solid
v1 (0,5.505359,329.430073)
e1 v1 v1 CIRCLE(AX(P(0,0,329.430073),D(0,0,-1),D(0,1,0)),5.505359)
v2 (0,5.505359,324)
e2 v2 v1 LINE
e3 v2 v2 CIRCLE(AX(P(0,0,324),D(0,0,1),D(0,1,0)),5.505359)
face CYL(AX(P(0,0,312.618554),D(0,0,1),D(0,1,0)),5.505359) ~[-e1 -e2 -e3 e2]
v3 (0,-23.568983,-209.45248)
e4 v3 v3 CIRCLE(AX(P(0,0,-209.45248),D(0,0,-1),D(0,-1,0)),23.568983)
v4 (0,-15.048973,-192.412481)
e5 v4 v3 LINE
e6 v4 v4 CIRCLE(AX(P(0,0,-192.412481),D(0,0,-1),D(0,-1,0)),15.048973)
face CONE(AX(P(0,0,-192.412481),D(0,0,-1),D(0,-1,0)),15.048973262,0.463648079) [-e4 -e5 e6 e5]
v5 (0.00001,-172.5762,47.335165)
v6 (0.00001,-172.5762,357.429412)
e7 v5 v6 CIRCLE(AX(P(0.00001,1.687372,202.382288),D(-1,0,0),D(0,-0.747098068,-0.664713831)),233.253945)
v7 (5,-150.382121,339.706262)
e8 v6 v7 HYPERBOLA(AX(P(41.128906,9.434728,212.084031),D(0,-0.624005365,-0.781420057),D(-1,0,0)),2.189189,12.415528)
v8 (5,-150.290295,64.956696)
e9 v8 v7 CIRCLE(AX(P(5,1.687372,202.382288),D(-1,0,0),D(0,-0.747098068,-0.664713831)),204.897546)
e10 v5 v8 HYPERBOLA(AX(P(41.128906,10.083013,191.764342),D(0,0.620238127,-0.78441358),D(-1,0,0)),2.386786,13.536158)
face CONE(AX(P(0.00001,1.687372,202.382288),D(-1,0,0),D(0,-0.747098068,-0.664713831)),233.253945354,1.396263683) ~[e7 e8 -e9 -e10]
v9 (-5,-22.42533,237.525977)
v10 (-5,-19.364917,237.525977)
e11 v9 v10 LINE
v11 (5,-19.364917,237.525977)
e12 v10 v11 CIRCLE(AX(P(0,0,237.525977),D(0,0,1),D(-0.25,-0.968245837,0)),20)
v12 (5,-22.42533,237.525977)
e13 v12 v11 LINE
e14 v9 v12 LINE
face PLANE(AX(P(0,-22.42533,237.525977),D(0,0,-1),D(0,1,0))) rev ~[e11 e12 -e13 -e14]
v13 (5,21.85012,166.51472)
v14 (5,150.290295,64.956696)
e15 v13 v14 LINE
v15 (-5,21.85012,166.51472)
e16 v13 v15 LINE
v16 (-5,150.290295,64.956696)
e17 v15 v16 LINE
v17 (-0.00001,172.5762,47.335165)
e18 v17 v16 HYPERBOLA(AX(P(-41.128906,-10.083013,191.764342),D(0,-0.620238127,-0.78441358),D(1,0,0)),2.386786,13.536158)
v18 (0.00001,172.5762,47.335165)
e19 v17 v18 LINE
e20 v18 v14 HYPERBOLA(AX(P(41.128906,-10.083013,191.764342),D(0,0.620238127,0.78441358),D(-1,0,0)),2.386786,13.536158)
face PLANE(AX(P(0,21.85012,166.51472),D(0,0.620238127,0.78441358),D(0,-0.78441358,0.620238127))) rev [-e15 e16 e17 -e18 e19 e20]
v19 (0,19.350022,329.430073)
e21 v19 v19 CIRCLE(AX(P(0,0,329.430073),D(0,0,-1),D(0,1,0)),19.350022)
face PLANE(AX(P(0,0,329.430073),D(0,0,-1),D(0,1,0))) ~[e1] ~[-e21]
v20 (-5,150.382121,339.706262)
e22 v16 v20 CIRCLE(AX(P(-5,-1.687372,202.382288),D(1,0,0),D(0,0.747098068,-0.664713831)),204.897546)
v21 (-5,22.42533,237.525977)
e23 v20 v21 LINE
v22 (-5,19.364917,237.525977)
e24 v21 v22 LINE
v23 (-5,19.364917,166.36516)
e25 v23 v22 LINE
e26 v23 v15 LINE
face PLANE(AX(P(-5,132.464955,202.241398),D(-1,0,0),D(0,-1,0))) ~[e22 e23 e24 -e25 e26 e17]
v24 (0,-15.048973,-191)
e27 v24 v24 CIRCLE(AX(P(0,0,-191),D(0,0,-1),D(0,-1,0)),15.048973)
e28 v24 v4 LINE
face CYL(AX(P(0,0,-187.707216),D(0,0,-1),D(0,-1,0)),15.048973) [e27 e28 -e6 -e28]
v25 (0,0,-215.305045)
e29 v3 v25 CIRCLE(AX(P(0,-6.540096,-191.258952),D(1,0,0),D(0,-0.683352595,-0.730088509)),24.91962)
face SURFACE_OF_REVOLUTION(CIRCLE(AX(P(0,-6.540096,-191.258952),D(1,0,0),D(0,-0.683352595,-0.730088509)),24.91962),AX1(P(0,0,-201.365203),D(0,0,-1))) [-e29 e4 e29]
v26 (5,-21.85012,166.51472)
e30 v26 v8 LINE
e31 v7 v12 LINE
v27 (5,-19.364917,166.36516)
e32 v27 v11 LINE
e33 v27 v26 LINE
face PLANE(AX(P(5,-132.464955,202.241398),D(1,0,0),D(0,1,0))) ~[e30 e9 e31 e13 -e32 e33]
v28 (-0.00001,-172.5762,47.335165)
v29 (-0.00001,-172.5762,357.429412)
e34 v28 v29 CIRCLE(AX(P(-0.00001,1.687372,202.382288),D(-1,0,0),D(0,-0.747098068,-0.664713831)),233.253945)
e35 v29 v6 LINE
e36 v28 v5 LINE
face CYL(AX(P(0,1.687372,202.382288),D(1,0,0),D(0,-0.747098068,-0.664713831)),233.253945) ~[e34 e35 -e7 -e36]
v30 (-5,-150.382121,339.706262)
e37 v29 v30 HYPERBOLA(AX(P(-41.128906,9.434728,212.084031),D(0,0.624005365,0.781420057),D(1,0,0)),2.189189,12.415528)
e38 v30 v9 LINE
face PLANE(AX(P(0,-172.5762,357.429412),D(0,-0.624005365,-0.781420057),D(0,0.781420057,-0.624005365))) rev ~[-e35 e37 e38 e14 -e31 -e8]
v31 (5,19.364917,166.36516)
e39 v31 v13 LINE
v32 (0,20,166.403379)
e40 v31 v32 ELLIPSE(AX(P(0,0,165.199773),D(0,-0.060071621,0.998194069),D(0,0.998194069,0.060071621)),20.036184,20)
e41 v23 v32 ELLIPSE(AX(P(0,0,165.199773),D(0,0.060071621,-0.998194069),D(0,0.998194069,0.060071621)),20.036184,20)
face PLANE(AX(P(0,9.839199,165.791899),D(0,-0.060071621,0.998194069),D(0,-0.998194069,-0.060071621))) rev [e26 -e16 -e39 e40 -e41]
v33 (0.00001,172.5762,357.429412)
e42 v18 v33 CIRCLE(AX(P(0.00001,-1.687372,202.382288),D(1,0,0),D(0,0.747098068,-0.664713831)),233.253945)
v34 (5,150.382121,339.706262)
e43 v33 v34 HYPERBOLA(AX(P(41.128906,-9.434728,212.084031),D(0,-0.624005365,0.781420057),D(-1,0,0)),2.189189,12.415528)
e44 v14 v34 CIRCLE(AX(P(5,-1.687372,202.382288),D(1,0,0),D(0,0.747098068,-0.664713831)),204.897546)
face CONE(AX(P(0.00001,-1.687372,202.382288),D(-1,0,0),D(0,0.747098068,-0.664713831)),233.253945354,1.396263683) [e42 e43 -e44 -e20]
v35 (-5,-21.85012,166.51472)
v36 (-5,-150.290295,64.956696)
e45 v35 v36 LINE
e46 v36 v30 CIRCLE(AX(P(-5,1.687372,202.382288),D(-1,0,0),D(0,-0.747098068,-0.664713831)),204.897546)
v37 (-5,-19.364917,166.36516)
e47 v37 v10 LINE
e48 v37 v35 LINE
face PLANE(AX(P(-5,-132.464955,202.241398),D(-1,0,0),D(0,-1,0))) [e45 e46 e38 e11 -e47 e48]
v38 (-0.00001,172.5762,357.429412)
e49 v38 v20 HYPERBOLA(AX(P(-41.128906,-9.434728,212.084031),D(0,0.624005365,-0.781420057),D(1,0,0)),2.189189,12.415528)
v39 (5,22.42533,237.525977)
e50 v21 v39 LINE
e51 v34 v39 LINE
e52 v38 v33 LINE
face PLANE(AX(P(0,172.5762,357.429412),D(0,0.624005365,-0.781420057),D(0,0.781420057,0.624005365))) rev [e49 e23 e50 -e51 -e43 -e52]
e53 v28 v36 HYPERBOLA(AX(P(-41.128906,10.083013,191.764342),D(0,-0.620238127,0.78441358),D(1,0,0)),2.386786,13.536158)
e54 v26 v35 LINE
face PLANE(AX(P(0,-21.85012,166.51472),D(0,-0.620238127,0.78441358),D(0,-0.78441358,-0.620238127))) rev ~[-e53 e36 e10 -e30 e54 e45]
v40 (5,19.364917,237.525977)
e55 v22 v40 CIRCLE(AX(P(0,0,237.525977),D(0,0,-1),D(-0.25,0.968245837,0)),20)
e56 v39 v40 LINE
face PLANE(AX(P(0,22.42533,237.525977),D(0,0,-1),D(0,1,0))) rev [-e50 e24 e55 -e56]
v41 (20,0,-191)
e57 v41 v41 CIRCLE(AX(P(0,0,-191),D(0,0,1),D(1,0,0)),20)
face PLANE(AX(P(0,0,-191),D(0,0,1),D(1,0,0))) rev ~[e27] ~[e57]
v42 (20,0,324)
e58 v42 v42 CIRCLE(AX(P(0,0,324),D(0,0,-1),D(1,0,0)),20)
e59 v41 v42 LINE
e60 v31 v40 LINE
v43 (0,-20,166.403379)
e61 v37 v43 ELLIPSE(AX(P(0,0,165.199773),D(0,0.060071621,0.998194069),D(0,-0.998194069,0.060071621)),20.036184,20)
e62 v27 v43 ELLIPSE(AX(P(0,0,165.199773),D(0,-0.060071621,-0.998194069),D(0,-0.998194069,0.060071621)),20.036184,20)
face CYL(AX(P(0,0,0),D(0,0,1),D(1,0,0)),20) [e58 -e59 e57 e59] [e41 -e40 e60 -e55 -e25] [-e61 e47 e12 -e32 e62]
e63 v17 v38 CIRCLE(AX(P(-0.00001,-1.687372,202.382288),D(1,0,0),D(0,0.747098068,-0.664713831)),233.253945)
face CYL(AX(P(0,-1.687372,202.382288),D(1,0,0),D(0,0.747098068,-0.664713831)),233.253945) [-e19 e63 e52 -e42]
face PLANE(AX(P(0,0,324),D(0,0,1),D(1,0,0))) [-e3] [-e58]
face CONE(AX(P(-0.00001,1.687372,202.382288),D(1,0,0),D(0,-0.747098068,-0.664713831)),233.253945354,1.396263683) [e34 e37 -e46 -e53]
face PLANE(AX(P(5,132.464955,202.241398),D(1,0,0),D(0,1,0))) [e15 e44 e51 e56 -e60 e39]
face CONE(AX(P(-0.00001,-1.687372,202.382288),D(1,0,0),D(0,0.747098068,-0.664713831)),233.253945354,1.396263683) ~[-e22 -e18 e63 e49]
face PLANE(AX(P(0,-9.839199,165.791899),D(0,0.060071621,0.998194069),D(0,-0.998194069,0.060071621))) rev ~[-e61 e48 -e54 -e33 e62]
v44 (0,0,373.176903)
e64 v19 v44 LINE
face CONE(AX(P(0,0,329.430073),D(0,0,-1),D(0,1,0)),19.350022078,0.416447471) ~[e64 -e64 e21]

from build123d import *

# Parameters (mm, degrees)
F0_R          = 20
F1_DEPTH      = 324
F1_DEPTH_BACK = 191
F3_DEPTH      = 5
F4_SIZE2      = 28.356399
F4_SIZE       = 4.99999


# Not quite as in the source:
# - a fillet or chamfer is up to 0.001 mm smaller than in the source, because OpenCascade refuses the exact size


with BuildPart() as f1:
    # F0 (on Top) → F1 (new body, two sides)
    with BuildSketch(Plane.XY) as f1_sk:
        Circle(F0_R)
    extrude(amount=F1_DEPTH)
    extrude(f1_sk.sketch, amount=-F1_DEPTH_BACK)

    # F2 (on Right) → F3 (join)
    with BuildSketch(Plane.YZ):
        with BuildLine():
            Line((9.8391985521, 165.7918989658), (21.8501202762, 166.5147198653))
            Line((21.8501202762, 166.5147198653), (172.5762003339, 47.3351646042))
            ThreePointArc((172.5762003339, 47.3351646042), (231.5665738369, 202.382288244), (172.5762003339, 357.4294118838))
            Line((172.5762003339, 357.4294118838), (22.4253297422, 237.5259771443))
            Line((22.4253297422, 237.5259771443), (9.8391985521, 237.5259771443))
            Line((9.8391985521, 237.5259771443), (9.8391985521, 165.7918989658))
        make_face()
    extrude(amount=F3_DEPTH)

    # F4 (size 5 and 28.3564090981 in the source; OpenCascade refuses exactly that, so slightly less here)
    f4_edges = [f1.edges().sort_by_distance(p)[0] for p in [
        (5, 231.566574, 202.382288),
    ]]
    f4_side = f1.faces().sort_by_distance((2.5, 231.566574, 202.382288))[0]
    chamfer(f4_edges, length=F4_SIZE, length2=F4_SIZE2, reference=f4_side)

    # F5: F1 across plane


with BuildPart() as f1_1:
    add(f1.part)
    add(f1.part.mirror(Plane.YZ))

    # F6: F1 across plane


with BuildPart() as f1_2:
    add(f1_1.part)
    add(f1_1.part.mirror(Plane.XZ))

    # F7 (on Right) → F8 (revolve)
    with BuildSketch(Plane.YZ):
        Polygon((5.505359266, 312.6185536385), (5.505359266, 329.4300734997), (19.3500220776, 329.4300734997), (0, 373.1769025326), (0, 329.4300734997), (0, 312.6185536385), align=None)
    revolve(axis=Axis((0, 0, 351.3034880161), (0, 0, -1)))

    # F9 (on Right) → F10 (revolve)
    with BuildSketch(Plane.YZ):
        with BuildLine():
            Line((-15.0489732623, -187.7072155476), (-15.0489732623, -192.4124807119))
            Line((-15.0489732623, -192.4124807119), (-23.5689829473, -209.4524800777))
            ThreePointArc((-23.5689829473, -209.4524800777), (-12.5456612149, -215.444084642), (0, -215.3050452471))
            Line((0, -215.3050452471), (0, -209.4524800777))
            Line((0, -209.4524800777), (0, -193.2779252529))
            Line((0, -193.2779252529), (0, -187.7072155476))
            Line((0, -187.7072155476), (-15.0489732623, -187.7072155476))
        make_face()
    revolve(axis=Axis((0, 0, -201.3652026653), (0, 0, -1)))


solid = f1_2.part
